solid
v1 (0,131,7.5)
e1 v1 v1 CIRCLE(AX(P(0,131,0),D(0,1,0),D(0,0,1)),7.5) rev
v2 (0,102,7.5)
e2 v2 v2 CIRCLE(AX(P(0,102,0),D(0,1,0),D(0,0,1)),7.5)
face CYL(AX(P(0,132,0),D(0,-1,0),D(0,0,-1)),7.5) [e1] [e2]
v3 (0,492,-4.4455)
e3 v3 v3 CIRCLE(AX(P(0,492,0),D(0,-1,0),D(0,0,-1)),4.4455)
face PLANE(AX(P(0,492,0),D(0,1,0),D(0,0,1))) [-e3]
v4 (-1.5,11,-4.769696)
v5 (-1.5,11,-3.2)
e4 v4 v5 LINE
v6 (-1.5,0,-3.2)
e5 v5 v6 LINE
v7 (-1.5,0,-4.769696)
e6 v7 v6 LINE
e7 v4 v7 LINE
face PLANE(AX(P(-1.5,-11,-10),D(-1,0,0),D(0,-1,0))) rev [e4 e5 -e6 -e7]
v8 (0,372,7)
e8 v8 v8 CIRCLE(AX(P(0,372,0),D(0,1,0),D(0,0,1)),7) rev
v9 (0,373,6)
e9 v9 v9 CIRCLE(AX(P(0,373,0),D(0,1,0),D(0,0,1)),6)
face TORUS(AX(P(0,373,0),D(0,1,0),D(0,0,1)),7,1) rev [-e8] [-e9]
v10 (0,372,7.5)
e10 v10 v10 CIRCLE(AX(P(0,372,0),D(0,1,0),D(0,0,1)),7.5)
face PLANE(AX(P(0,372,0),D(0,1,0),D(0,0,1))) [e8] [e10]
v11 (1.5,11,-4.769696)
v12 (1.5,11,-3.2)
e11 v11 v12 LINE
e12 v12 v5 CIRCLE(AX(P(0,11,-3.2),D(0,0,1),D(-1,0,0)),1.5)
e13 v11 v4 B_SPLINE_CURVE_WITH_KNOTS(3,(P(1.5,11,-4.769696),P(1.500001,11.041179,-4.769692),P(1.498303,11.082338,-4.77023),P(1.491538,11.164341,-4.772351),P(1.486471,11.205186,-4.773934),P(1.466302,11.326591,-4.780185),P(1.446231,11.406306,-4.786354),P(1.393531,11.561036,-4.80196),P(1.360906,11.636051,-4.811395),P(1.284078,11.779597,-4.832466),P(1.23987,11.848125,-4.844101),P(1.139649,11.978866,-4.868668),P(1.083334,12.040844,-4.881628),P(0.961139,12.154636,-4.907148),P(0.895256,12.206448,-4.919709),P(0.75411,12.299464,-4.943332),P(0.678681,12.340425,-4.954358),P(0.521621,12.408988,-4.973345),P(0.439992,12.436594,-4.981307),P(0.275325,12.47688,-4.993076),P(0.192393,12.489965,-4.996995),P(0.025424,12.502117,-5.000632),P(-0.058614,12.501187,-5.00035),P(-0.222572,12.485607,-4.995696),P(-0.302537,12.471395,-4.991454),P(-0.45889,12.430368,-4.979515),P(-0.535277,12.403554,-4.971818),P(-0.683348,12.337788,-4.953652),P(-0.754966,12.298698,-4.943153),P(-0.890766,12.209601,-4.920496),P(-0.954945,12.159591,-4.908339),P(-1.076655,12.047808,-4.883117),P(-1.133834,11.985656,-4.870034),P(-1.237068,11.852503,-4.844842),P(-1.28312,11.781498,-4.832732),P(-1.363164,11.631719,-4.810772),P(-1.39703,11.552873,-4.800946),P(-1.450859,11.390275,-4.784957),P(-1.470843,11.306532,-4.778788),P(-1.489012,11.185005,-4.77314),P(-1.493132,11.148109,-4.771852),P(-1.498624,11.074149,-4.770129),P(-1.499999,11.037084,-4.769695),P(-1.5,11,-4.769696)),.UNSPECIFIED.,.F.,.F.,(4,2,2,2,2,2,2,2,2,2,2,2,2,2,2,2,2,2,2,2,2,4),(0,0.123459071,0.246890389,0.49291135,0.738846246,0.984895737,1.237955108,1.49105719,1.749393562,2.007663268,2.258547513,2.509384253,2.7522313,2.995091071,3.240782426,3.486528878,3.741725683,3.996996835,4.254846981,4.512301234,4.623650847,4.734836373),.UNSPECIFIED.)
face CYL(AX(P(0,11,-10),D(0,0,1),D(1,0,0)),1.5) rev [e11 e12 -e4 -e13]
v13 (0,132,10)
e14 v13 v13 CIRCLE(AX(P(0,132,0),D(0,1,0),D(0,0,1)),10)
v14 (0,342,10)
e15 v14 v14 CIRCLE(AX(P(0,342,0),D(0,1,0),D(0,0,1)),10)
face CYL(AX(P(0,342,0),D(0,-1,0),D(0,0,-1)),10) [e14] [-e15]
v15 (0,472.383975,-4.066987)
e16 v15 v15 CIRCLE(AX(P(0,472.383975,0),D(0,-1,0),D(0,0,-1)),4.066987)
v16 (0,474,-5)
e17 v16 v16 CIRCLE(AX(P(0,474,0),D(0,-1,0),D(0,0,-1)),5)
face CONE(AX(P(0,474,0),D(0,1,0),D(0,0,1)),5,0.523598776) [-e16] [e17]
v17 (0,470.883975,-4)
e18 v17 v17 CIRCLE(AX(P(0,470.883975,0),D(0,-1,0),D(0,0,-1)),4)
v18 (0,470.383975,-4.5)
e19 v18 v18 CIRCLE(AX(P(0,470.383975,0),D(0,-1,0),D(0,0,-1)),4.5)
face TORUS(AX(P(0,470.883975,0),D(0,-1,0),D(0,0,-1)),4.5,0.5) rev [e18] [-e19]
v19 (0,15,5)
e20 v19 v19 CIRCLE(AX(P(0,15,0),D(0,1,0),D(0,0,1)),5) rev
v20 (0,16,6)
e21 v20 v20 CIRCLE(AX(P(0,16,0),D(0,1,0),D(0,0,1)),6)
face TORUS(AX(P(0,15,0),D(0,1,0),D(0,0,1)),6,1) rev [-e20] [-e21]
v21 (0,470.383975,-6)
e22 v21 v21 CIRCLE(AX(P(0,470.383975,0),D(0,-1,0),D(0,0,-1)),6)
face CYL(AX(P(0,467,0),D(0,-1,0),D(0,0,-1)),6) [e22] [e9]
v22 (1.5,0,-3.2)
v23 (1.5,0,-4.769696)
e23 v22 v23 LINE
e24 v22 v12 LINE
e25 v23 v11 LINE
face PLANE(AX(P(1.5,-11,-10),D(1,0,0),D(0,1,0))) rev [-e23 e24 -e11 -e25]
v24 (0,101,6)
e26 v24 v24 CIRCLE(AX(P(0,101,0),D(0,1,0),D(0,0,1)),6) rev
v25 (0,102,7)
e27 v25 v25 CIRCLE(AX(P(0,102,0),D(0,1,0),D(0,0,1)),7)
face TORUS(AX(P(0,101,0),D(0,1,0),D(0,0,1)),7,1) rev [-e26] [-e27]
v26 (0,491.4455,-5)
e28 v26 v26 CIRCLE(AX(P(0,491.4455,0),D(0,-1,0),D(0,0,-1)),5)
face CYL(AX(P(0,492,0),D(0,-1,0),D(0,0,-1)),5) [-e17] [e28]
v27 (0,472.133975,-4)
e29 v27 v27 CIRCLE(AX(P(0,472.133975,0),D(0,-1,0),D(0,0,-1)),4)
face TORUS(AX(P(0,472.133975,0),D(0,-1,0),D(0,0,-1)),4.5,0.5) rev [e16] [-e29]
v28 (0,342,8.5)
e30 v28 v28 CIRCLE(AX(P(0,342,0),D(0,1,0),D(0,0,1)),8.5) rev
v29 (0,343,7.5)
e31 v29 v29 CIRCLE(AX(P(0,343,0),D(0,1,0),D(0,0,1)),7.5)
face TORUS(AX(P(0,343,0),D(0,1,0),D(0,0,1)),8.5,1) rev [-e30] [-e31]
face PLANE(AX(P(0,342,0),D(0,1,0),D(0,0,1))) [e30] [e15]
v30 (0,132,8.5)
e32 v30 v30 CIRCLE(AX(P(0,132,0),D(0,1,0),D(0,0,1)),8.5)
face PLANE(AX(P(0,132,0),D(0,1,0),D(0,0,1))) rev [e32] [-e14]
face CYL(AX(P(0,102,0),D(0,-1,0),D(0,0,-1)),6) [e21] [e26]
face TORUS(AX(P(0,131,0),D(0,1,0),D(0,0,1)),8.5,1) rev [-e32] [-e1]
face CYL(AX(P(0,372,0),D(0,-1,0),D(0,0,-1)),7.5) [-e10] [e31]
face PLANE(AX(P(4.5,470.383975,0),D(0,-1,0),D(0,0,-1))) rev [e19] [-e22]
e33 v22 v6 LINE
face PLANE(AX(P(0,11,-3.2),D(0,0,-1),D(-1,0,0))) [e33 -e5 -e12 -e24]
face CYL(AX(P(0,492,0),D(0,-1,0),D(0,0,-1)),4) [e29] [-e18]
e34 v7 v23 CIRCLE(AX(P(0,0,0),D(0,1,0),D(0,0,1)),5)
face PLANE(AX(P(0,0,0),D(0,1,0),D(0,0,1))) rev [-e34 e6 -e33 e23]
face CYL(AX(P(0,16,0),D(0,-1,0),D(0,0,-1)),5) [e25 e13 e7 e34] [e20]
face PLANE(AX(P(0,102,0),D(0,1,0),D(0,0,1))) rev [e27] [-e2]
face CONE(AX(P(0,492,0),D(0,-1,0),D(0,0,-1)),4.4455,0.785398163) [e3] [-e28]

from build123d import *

# Parameters (mm, degrees)
SKETCH1_R           = 5
BOSS_EXTRUDE1_DEPTH = 16
SKETCH2_R           = 6
BOSS_EXTRUDE2_DEPTH = 86
SKETCH3_R           = 7.5
BOSS_EXTRUDE3_DEPTH = 30
SKETCH4_R           = 10
BOSS_EXTRUDE4_DEPTH = 210
SKETCH5_R           = 7.5
BOSS_EXTRUDE5_DEPTH = 30
SKETCH6_R           = 6
BOSS_EXTRUDE6_DEPTH = 95
SKETCH32_R          = 6
BOSS_EXTRUDE7_DEPTH = 25
CUT_EXTRUDE1_START  = -3.2
CUT_EXTRUDE1_DEPTH  = 490.003210067
FILLET1_R           = 1


# Read off the part's stored shape, not the designer's step: M10x1.0 Machine Threads Stud1
with BuildPart() as part:
    # Sketch1 → Boss-Extrude1 (new body)
    with BuildSketch(Plane(origin=(0, 0, 0), x_dir=(1, 0, 0), z_dir=(0, 1, 0))):
        with Locations(Location((0, 0, 0), (0, 0, 270))):
            Circle(SKETCH1_R)
    extrude(amount=BOSS_EXTRUDE1_DEPTH)

    # Sketch2 → Boss-Extrude2 (add)
    with BuildSketch(Plane(origin=(0, 16, 0), x_dir=(1, 0, 0), z_dir=(0, 1, 0))):
        with Locations(Location((0, 0, 0), (0, 0, 270))):
            Circle(SKETCH2_R)
    extrude(amount=BOSS_EXTRUDE2_DEPTH)

    # Sketch3 → Boss-Extrude3 (add)
    with BuildSketch(Plane(origin=(0, 102, 0), x_dir=(1, 0, 0), z_dir=(0, 1, 0))):
        with Locations(Location((0, 0, 0), (0, 0, 270))):
            Circle(SKETCH3_R)
    extrude(amount=BOSS_EXTRUDE3_DEPTH)

    # Sketch4 → Boss-Extrude4 (add)
    with BuildSketch(Plane(origin=(0, 132, 0), x_dir=(1, 0, 0), z_dir=(0, 1, 0))):
        with Locations(Location((0, 0, 0), (0, 0, 270))):
            Circle(SKETCH4_R)
    extrude(amount=BOSS_EXTRUDE4_DEPTH)

    # Sketch5 → Boss-Extrude5 (add)
    with BuildSketch(Plane(origin=(0, 342, 0), x_dir=(1, 0, 0), z_dir=(0, 1, 0))):
        with Locations(Location((0, 0, 0), (0, 0, 270))):
            Circle(SKETCH5_R)
    extrude(amount=BOSS_EXTRUDE5_DEPTH)

    # Sketch6 → Boss-Extrude6 (add)
    with BuildSketch(Plane(origin=(0, 372, 0), x_dir=(1, 0, 0), z_dir=(0, 1, 0))):
        with Locations(Location((0, 0, 0), (0, 0, 270))):
            Circle(SKETCH6_R)
    extrude(amount=BOSS_EXTRUDE6_DEPTH)

    # Sketch32 → Boss-Extrude7 (add)
    with BuildSketch(Plane(origin=(0, 467, 0), x_dir=(1, 0, 0), z_dir=(0, 1, 0))):
        with Locations(Location((0, 0, 0), (0, 0, 270))):
            Circle(SKETCH32_R)
    extrude(amount=BOSS_EXTRUDE7_DEPTH)

    # M10x1.0 Machine Threads Stud1 outline → M10x1.0 Machine Threads Stud1 (revolve, cut)
    with BuildSketch(Plane.XY):
        with BuildLine():
            Line((6, 492), (4.4455, 492))
            Line((4.4455, 492), (5, 491.4455))
            Line((5, 491.4455), (5, 474))
            Line((5, 474), (4.066987298, 472.383974596))
            ThreePointArc((4.066987298, 472.383974596), (4.017037087, 472.263384119), (4, 472.133974596))
            Line((4, 472.133974596), (4, 470.883974596))
            ThreePointArc((4, 470.883974596), (4.14644661, 470.530421205), (4.5, 470.383974596))
            Line((4.5, 470.383974596), (6, 470.383974596))
            Line((6, 470.383974596), (6, 492))
        make_face()
    revolve(axis=Axis((0, 0, 0), (0, 1, 0)), mode=Mode.SUBTRACT)

    # Sketch34 → Cut-Extrude1 (cut, through all)
    with BuildSketch(Plane.XY.offset(CUT_EXTRUDE1_START)):
        with BuildLine():
            Line((1.5, -11), (-1.5, -11))
            Line((-1.5, -11), (-1.5, 11))
            ThreePointArc((-1.5, 11), (0, 12.5), (1.5, 11))
            Line((1.5, 11), (1.5, -11))
        make_face()
    extrude(amount=-CUT_EXTRUDE1_DEPTH, mode=Mode.SUBTRACT)

    # Fillet1
    fillet1_edges = [part.edges().sort_by_distance(p)[0] for p in [
        (0, 132, -7.5),
        (0, 342, -7.5),
        (0, 372, -6),
        (0, 16, -5),
        (0, 102, -6),
    ]]
    fillet(fillet1_edges, radius=FILLET1_R - 0.0001)  # a hair under: the kernel refuses the full size


solid = part.part
